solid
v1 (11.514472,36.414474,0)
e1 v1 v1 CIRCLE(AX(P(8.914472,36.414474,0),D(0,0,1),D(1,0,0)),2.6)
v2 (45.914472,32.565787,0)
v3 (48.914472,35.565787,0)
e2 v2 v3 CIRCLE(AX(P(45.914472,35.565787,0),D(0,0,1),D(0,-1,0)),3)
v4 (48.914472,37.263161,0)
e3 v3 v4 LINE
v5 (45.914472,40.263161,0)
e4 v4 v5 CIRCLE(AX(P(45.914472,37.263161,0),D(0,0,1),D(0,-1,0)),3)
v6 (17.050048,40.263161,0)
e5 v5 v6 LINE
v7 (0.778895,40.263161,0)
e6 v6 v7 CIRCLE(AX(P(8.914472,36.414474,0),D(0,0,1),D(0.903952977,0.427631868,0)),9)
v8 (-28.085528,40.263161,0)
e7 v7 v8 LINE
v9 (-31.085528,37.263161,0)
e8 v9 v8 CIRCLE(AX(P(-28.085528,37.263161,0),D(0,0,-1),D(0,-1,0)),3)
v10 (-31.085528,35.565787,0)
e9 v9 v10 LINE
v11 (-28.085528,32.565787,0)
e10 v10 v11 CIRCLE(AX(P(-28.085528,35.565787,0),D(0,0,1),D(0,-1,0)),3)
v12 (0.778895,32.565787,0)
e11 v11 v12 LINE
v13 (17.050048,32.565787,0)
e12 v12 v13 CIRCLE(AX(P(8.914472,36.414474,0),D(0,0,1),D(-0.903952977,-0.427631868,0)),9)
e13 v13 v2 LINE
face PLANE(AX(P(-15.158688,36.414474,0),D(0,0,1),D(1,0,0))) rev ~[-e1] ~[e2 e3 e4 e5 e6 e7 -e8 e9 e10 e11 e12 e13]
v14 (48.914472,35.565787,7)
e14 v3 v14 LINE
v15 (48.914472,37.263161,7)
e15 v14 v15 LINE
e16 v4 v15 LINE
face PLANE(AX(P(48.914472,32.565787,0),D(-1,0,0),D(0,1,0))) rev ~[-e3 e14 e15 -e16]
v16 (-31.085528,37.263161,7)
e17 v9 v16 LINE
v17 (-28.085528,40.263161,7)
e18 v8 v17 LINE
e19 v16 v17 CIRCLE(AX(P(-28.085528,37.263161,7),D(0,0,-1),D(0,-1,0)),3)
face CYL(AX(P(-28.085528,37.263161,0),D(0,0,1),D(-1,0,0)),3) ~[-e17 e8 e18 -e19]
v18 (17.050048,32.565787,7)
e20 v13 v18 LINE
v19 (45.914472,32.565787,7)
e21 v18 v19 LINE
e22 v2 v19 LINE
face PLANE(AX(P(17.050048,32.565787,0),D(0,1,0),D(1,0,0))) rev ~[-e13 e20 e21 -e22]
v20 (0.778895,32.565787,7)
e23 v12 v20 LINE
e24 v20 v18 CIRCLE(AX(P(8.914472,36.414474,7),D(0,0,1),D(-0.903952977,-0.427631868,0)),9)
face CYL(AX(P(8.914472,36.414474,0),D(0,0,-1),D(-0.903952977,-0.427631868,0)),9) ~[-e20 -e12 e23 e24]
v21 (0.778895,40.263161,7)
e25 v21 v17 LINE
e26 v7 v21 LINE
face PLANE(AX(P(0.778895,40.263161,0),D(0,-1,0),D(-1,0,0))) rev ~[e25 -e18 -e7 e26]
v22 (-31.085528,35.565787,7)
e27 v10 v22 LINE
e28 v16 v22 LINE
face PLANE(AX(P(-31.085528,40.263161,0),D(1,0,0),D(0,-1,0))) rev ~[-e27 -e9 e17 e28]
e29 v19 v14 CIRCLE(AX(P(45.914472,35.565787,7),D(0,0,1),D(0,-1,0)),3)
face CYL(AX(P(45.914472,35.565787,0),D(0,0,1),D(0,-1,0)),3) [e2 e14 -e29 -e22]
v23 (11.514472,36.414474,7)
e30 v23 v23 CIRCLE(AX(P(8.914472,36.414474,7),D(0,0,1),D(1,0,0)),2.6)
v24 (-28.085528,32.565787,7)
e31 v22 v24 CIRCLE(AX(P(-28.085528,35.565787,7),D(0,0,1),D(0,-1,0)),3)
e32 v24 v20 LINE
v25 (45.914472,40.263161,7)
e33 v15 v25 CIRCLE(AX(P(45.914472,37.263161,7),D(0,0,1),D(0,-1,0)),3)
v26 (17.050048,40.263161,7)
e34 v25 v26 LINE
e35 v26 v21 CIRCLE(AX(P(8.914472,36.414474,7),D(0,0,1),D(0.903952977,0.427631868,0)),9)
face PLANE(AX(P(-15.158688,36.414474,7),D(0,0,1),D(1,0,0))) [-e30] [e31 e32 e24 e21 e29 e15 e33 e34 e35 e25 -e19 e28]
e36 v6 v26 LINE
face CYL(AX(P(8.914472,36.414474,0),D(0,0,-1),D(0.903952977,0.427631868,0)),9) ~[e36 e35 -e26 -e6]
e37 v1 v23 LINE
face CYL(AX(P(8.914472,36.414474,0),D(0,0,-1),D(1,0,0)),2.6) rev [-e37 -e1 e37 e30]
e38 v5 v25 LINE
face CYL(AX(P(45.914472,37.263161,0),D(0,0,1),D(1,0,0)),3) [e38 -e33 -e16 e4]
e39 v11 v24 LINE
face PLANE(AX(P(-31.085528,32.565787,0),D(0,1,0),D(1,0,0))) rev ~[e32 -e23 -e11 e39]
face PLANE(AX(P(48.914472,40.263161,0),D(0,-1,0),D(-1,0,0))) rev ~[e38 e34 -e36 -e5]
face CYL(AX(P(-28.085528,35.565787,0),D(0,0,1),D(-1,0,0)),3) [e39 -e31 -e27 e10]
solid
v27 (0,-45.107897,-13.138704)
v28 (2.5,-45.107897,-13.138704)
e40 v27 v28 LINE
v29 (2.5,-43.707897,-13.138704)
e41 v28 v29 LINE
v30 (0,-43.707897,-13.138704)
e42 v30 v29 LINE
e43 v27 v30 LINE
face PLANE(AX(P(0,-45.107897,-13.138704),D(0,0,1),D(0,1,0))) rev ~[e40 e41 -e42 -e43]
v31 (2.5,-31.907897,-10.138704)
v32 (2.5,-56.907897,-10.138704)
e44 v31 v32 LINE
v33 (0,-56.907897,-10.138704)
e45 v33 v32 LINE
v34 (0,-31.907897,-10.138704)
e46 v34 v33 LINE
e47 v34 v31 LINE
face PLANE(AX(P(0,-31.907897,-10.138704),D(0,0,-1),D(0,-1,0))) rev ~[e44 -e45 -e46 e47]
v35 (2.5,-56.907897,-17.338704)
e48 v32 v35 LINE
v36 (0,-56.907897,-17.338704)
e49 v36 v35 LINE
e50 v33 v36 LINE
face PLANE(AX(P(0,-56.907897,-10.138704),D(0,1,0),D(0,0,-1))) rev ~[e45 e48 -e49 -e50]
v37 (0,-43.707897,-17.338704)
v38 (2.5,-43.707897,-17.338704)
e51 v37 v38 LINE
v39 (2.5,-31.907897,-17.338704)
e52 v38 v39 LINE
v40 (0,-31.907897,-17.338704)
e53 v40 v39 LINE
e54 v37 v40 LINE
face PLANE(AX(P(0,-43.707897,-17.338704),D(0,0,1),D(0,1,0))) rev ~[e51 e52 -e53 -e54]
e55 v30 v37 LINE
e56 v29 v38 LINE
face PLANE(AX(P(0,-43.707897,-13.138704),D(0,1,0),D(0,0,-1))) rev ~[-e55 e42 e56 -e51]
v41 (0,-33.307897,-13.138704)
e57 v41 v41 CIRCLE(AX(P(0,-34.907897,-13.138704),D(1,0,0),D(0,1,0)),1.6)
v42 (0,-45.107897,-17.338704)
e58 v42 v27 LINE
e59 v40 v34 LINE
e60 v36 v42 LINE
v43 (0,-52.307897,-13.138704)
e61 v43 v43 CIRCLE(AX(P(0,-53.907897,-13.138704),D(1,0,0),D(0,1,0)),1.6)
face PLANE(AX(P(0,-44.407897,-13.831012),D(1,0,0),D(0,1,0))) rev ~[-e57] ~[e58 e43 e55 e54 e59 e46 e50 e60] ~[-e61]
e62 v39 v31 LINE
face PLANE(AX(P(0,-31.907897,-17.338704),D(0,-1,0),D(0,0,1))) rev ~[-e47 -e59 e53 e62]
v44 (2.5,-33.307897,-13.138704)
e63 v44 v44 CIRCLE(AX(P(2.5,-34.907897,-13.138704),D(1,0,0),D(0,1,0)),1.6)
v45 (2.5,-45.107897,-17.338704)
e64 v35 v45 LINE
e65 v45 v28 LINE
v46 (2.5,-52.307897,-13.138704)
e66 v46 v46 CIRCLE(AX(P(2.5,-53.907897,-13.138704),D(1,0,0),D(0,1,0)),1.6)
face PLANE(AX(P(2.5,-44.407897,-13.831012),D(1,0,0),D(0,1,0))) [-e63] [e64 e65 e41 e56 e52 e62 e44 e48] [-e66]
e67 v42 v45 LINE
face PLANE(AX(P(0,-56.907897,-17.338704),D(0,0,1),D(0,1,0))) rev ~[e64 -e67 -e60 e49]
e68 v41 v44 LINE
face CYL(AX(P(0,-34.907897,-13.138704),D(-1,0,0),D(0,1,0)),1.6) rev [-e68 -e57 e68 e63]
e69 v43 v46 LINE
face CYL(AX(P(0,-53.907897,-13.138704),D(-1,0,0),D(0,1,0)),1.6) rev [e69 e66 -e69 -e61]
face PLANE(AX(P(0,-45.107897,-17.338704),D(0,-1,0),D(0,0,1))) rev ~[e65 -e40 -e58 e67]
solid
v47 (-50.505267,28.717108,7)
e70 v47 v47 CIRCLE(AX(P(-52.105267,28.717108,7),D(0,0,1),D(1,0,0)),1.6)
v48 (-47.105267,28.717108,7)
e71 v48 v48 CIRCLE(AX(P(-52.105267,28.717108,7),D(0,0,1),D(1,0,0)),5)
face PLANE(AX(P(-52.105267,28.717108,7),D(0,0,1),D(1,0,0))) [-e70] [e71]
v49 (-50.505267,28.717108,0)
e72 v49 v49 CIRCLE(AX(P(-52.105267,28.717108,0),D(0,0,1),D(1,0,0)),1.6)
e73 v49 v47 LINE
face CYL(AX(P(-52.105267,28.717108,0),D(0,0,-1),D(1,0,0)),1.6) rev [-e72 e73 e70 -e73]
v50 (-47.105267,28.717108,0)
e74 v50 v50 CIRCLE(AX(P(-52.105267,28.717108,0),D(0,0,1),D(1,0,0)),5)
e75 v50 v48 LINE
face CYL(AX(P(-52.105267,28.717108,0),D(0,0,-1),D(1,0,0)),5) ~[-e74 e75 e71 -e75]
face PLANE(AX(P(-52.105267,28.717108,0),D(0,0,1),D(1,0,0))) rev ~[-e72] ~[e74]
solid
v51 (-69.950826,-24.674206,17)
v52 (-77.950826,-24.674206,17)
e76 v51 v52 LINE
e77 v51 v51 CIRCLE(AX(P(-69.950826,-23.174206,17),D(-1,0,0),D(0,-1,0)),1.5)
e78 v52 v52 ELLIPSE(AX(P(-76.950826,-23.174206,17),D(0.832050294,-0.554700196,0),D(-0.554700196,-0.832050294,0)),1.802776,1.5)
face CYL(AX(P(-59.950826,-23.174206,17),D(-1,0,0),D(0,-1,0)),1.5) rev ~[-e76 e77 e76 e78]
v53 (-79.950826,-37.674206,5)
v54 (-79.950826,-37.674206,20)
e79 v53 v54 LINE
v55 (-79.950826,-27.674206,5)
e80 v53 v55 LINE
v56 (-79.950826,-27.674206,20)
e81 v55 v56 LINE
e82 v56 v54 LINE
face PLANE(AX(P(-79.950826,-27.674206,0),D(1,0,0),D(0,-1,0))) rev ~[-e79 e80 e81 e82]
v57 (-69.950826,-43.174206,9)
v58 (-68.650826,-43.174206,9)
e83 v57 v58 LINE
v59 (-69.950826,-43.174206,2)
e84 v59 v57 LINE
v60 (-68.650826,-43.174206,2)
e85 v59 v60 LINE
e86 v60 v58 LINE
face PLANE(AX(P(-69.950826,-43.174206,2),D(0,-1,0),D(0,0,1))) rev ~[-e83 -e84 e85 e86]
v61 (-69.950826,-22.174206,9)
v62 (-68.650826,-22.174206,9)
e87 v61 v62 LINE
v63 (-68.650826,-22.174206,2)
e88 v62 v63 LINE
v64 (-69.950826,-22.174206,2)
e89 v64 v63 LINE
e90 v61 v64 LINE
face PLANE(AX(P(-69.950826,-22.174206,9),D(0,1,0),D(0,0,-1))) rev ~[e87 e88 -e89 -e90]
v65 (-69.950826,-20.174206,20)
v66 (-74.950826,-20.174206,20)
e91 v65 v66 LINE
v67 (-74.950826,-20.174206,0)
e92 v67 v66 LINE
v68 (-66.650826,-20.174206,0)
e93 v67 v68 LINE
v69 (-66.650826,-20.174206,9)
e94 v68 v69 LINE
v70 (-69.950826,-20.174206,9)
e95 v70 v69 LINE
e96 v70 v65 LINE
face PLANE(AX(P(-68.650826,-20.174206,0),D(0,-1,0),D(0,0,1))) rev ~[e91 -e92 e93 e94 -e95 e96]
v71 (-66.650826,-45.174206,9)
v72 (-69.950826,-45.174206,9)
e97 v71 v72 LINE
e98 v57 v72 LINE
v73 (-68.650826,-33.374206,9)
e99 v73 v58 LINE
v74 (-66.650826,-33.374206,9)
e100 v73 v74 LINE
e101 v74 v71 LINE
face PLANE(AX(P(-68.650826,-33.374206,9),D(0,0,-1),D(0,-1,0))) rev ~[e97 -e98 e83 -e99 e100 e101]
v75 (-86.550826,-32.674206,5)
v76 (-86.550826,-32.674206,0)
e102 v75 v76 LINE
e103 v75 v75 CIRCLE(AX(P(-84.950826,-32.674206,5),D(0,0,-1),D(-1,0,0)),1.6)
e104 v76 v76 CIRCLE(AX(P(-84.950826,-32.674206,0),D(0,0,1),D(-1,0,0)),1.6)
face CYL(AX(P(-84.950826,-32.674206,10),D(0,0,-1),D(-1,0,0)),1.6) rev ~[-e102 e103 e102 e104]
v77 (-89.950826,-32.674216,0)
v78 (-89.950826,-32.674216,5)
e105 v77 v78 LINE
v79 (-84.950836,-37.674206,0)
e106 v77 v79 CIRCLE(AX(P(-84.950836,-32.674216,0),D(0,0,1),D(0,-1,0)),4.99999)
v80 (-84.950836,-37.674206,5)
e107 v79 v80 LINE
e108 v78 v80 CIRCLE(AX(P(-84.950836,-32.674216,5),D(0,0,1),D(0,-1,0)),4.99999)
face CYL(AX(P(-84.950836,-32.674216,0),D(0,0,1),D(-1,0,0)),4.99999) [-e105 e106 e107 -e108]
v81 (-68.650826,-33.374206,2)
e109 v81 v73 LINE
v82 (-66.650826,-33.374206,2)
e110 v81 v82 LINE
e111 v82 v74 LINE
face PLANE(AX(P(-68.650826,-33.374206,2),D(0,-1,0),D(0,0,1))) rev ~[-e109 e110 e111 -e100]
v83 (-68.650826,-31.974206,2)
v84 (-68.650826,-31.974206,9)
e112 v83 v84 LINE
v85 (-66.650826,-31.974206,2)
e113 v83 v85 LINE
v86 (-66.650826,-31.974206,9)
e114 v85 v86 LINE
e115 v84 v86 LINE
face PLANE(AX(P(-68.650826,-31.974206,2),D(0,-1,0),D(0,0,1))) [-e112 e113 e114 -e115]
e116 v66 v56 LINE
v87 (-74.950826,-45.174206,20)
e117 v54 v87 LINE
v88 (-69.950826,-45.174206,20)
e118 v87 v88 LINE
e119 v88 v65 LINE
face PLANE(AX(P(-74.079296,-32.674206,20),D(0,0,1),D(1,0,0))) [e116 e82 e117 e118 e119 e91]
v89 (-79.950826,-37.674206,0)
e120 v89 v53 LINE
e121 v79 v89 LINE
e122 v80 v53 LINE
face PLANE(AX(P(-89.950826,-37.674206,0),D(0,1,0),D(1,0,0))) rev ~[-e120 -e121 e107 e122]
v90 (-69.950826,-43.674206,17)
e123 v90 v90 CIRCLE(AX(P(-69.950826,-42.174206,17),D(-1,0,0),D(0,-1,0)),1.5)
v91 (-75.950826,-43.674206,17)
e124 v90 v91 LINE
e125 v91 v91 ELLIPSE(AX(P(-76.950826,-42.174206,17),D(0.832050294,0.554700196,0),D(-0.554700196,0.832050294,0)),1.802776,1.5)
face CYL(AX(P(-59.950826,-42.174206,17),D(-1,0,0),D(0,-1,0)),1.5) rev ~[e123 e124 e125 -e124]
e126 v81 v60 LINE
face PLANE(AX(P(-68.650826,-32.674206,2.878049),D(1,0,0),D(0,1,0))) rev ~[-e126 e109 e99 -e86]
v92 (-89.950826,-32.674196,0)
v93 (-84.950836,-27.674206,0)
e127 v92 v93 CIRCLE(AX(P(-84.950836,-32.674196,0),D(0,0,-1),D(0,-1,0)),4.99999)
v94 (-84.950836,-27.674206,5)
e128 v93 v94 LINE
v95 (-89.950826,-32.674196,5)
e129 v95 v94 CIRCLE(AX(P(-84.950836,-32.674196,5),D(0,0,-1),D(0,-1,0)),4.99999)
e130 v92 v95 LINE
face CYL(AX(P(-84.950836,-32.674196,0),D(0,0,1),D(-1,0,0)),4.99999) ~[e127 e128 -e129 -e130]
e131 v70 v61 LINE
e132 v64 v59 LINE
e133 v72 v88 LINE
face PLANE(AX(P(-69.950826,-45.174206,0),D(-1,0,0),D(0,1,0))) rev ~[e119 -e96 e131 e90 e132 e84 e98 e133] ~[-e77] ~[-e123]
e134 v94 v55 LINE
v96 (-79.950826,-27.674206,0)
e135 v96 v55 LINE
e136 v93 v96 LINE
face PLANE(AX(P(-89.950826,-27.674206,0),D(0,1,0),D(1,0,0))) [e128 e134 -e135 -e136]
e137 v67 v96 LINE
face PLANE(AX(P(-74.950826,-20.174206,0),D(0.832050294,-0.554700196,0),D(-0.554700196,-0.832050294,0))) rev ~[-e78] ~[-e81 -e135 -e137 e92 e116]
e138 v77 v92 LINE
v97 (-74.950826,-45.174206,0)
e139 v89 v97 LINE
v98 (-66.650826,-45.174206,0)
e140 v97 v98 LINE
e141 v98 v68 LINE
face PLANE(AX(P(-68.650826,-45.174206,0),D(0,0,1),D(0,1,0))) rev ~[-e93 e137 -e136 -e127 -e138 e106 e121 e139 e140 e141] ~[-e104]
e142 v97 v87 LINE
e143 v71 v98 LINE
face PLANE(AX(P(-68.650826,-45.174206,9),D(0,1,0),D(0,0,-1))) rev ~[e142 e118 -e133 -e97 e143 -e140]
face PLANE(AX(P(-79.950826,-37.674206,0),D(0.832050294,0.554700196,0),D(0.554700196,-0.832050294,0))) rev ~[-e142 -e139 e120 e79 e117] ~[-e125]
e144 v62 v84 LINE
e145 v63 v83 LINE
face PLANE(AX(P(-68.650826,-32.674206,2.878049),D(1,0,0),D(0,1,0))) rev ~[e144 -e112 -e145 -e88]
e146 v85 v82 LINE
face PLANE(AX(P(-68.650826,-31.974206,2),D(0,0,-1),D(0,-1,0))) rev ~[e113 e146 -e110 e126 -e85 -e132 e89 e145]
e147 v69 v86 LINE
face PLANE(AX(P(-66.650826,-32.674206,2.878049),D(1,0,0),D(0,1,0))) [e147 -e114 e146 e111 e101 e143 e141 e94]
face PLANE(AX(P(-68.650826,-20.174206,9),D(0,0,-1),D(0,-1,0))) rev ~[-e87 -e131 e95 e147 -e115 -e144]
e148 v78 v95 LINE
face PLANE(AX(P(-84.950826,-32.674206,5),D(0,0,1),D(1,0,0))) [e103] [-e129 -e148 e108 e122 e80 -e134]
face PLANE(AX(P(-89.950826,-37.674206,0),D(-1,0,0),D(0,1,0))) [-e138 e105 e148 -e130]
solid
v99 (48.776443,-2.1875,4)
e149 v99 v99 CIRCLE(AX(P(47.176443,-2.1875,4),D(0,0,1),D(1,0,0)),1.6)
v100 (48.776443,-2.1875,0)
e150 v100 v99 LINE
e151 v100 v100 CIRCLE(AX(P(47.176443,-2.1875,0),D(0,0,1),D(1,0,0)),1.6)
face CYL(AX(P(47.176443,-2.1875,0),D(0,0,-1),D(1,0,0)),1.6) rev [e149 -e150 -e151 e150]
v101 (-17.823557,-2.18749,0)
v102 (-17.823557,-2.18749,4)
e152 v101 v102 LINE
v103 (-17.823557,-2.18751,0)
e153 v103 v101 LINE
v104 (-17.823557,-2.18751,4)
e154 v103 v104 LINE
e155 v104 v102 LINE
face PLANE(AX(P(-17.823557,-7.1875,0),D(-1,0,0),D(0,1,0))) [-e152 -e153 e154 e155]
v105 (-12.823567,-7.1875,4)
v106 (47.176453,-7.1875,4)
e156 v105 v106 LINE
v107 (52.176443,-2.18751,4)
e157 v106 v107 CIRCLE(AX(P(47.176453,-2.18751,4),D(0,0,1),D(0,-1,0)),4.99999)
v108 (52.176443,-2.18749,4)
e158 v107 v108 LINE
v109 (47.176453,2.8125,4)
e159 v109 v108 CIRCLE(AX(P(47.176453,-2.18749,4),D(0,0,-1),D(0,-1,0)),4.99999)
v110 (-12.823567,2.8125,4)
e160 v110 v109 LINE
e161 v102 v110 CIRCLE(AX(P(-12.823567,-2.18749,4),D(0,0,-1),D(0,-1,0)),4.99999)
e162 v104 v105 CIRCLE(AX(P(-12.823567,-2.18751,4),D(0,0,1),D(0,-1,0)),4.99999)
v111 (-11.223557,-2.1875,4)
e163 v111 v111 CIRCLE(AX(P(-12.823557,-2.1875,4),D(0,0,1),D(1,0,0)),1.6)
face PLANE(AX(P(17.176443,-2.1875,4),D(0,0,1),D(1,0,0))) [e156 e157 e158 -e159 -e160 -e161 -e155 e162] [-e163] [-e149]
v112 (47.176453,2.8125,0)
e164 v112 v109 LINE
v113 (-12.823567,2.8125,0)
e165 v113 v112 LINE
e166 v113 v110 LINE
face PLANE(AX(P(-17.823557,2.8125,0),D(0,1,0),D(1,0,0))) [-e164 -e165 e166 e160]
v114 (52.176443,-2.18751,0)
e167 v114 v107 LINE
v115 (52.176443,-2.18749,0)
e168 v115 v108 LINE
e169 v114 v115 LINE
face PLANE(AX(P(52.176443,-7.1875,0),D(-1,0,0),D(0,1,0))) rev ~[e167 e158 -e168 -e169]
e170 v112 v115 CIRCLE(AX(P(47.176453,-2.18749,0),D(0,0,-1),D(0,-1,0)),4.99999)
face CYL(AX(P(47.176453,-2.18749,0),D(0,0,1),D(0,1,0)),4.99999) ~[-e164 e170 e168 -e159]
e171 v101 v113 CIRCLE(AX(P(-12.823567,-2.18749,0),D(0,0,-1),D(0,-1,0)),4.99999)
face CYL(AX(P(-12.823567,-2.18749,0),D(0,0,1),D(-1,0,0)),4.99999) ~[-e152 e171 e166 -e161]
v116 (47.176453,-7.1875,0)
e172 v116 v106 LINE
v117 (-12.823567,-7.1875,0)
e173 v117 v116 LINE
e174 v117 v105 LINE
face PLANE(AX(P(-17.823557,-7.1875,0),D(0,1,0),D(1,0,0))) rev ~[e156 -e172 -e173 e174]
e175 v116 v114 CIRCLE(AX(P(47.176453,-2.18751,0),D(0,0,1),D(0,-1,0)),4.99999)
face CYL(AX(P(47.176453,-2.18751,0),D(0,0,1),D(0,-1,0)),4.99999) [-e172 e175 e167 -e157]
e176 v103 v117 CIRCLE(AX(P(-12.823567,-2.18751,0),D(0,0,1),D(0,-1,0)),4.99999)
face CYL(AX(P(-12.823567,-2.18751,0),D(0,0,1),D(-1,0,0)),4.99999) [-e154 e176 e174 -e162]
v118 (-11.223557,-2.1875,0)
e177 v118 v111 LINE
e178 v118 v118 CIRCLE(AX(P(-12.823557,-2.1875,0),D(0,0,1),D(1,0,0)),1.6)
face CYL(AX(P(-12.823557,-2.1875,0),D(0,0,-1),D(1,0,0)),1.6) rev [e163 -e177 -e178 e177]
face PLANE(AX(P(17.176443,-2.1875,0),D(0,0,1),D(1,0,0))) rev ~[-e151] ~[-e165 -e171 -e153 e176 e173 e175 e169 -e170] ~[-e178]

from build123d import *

# Parameters (mm, degrees)
F0_W      = 70
F0_H      = 10
F0_R      = 1.6
F1_DEPTH  = 4
F2_R      = 4.99999
F3_R      = 5
F3_R_2    = 1.6
F4_DEPTH  = 7
F7_DEPTH  = 20
F6_W      = 10
F6_H      = 10
F8_DEPTH  = 5
F10_D     = 3.2
F10_DEPTH = 5
F10_TIP   = 0.9613769904
F11_R     = 4.99999
F13_DEPTH = 1.3
F14_W     = 9.8
F14_H     = 7
F15_DEPTH = 2
F16_D     = 3
F16_DEPTH = 10
F16_TIP   = 0.9012909285
F17_R     = 1.6
F18_DEPTH = 2.5
F5_R      = 2.6
F19_DEPTH = 7
F20_R     = 3


# Not quite as in the source:
# - a fillet or chamfer is up to 0.001 mm smaller than in the source, because OpenCascade refuses the exact size


with BuildPart() as f1:
    # F0 (on Top) → F1 (new body)
    with BuildSketch(Plane.XY):
        with Locations((17.1764425881, -2.1875003539)):
            Rectangle(F0_W, F0_H)
        with Locations((-12.8235574119, -2.1875003539)):
            Circle(F0_R, mode=Mode.SUBTRACT)
        with Locations((47.1764425881, -2.1875003539)):
            Circle(F0_R, mode=Mode.SUBTRACT)
    extrude(amount=F1_DEPTH)

    # F2 (radius 5 in the source; OpenCascade refuses exactly that, so slightly less here)
    f2_edges = [f1.edges().sort_by_distance(p)[0] for p in [
        (-17.823557, 2.8125, 2),
        (-17.823557, -7.1875, 2),
        (52.176443, 2.8125, 2),
        (52.176443, -7.1875, 2),
    ]]
    fillet(f2_edges, radius=F2_R)


with BuildPart() as f4:
    # F3 (on Top) → F4 (new body)
    with BuildSketch(Plane.XY):
        with Locations((-52.1052666008, 28.7171080709)):
            Circle(F3_R)
        with Locations((-52.1052666008, 28.7171080709)):
            Circle(F3_R_2, mode=Mode.SUBTRACT)
    extrude(amount=F4_DEPTH)


with BuildPart() as f7:
    # F6 (on Top) → F7 (new body)
    with BuildSketch(Plane.XY):
        Polygon((-74.9508264661, -20.1742056012), (-79.9508264661, -27.6742056012), (-79.9508264661, -37.6742056012), (-74.9508264661, -45.1742056012), (-69.9508264661, -45.1742056012), (-69.9508264661, -20.1742056012), align=None)
    extrude(amount=F7_DEPTH)

    # F6 (on Top) → F8 (join)
    with BuildSketch(Plane.XY):
        with Locations((-84.9508264661, -32.6742056012)):
            Rectangle(F6_W, F6_H)
    extrude(amount=F8_DEPTH)

    # F10
    with Locations(Plane.XY.offset(5)):
        with Locations((-84.9508264661, -32.6742056012)):
            Hole(F10_D / 2, depth=F10_DEPTH)
            with Locations((0, 0, -(F10_DEPTH + F10_TIP / 2))):  # 118° drill point
                Cone(0, F10_D / 2, F10_TIP, mode=Mode.SUBTRACT)

    # F11 (radius 5 in the source; OpenCascade refuses exactly that, so slightly less here)
    f11_edges = [f7.edges().sort_by_distance(p)[0] for p in [
        (-89.950826, -37.674206, 2.5),
        (-89.950826, -27.674206, 2.5),
    ]]
    fillet(f11_edges, radius=F11_R)

    # F12 (on face) → F13 (join)
    with BuildSketch(Plane.YZ.offset(-69.9508264661)):
        Polygon((-43.1742056012, 9), (-45.1742056012, 9), (-45.1742056012, 0), (-20.1742056012, 0), (-20.1742056012, 9), (-22.1742056012, 9), (-22.1742056012, 2), (-43.1742056012, 2), align=None)
    extrude(amount=F13_DEPTH)

    # F14 (on face) → F15 (join)
    with BuildSketch(Plane.YZ.offset(-68.6508264661)):
        Polygon((-43.1742056012, 9), (-45.1742056012, 9), (-45.1742056012, 0), (-20.1742056012, 0), (-20.1742056012, 9), (-22.1742056012, 9), (-22.1742056012, 2), (-31.9742056012, 2), (-33.3742056012, 2), (-43.1742056012, 2), align=None)
        with Locations((-38.2742056012, 5.5)):
            Rectangle(F14_W, F14_H)
        with Locations((-27.0742056012, 5.5)):
            Rectangle(F14_W, F14_H)
    extrude(amount=F15_DEPTH)

    # F16
    with Locations(Plane.YZ.offset(-69.9508264661)):
        with Locations((-42.1742056012, 17), (-23.1742056012, 17)):
            Hole(F16_D / 2, depth=F16_DEPTH)
            with Locations((0, 0, -(F16_DEPTH + F16_TIP / 2))):  # 118° drill point
                Cone(0, F16_D / 2, F16_TIP, mode=Mode.SUBTRACT)


with BuildPart() as f18:
    # F17 (on Right) → F18 (new body)
    with BuildSketch(Plane.YZ):
        Polygon((-31.9078966975, -10.1387043178), (-56.9078966975, -10.1387043178), (-56.9078966975, -17.3387043178), (-45.1078966975, -17.3387043178), (-45.1078966975, -13.1387043178), (-43.7078966975, -13.1387043178), (-43.7078966975, -17.3387043178), (-31.9078966975, -17.3387043178), align=None)
        with Locations((-53.9078966975, -13.1387043178)):
            Circle(F17_R, mode=Mode.SUBTRACT)
        with Locations((-34.9078966975, -13.1387043178)):
            Circle(F17_R, mode=Mode.SUBTRACT)
    extrude(amount=F18_DEPTH)


with BuildPart() as f19:
    # F5 (on Top) → F19 (new body)
    with BuildSketch(Plane.XY):
        with BuildLine():
            ThreePointArc((0.7788947706, 32.5657874346), (-0.0855284333, 36.4144742489), (0.7788947706, 40.2631610632))
            Line((0.7788947706, 40.2631610632), (-31.0855284333, 40.2631610632))
            Line((-31.0855284333, 40.2631610632), (-31.0855284333, 32.5657874346))
            Line((-31.0855284333, 32.5657874346), (0.7788947706, 32.5657874346))
        make_face()
        with BuildLine():
            ThreePointArc((17.0500483628, 32.5657874346), (17.6957069913, 34.4421901878), (17.9144715667, 36.4144742489))
            ThreePointArc((17.9144715667, 36.4144742489), (17.6957069913, 38.3867583099), (17.0500483628, 40.2631610632))
            Line((17.0500483628, 40.2631610632), (0.7788947706, 40.2631610632))
            ThreePointArc((0.7788947706, 40.2631610632), (-0.0855284333, 36.4144742489), (0.7788947706, 32.5657874346))
            Line((0.7788947706, 32.5657874346), (17.0500483628, 32.5657874346))
        make_face()
        with Locations((8.9144715667, 36.4144742489)):
            Circle(F5_R, mode=Mode.SUBTRACT)
        with BuildLine():
            Line((0.7788947706, 40.2631610632), (17.0500483628, 40.2631610632))
            ThreePointArc((17.0500483628, 40.2631610632), (8.9144715667, 45.4144742489), (0.7788947706, 40.2631610632))
        make_face()
        with BuildLine():
            ThreePointArc((0.7788947706, 32.5657874346), (8.9144715667, 27.4144742489), (17.0500483628, 32.5657874346))
            Line((17.0500483628, 32.5657874346), (0.7788947706, 32.5657874346))
        make_face()
        with BuildLine():
            ThreePointArc((17.0500483628, 40.2631610632), (17.6957069913, 38.3867583099), (17.9144715667, 36.4144742489))
            ThreePointArc((17.9144715667, 36.4144742489), (17.6957069913, 34.4421901878), (17.0500483628, 32.5657874346))
            Line((17.0500483628, 32.5657874346), (48.9144715667, 32.5657874346))
            Line((48.9144715667, 32.5657874346), (48.9144715667, 40.2631610632))
            Line((48.9144715667, 40.2631610632), (17.0500483628, 40.2631610632))
        make_face()
    extrude(amount=F19_DEPTH)

    # F20
    f20_edges = [f19.edges().sort_by_distance(p)[0] for p in [
        (-31.085528, 40.263161, 3.5),
        (-31.085528, 32.565787, 3.5),
        (48.914472, 40.263161, 3.5),
        (48.914472, 32.565787, 3.5),
    ]]
    fillet(f20_edges, radius=F20_R)


solid = Compound([f1.part, f4.part, f7.part, f18.part, f19.part])
